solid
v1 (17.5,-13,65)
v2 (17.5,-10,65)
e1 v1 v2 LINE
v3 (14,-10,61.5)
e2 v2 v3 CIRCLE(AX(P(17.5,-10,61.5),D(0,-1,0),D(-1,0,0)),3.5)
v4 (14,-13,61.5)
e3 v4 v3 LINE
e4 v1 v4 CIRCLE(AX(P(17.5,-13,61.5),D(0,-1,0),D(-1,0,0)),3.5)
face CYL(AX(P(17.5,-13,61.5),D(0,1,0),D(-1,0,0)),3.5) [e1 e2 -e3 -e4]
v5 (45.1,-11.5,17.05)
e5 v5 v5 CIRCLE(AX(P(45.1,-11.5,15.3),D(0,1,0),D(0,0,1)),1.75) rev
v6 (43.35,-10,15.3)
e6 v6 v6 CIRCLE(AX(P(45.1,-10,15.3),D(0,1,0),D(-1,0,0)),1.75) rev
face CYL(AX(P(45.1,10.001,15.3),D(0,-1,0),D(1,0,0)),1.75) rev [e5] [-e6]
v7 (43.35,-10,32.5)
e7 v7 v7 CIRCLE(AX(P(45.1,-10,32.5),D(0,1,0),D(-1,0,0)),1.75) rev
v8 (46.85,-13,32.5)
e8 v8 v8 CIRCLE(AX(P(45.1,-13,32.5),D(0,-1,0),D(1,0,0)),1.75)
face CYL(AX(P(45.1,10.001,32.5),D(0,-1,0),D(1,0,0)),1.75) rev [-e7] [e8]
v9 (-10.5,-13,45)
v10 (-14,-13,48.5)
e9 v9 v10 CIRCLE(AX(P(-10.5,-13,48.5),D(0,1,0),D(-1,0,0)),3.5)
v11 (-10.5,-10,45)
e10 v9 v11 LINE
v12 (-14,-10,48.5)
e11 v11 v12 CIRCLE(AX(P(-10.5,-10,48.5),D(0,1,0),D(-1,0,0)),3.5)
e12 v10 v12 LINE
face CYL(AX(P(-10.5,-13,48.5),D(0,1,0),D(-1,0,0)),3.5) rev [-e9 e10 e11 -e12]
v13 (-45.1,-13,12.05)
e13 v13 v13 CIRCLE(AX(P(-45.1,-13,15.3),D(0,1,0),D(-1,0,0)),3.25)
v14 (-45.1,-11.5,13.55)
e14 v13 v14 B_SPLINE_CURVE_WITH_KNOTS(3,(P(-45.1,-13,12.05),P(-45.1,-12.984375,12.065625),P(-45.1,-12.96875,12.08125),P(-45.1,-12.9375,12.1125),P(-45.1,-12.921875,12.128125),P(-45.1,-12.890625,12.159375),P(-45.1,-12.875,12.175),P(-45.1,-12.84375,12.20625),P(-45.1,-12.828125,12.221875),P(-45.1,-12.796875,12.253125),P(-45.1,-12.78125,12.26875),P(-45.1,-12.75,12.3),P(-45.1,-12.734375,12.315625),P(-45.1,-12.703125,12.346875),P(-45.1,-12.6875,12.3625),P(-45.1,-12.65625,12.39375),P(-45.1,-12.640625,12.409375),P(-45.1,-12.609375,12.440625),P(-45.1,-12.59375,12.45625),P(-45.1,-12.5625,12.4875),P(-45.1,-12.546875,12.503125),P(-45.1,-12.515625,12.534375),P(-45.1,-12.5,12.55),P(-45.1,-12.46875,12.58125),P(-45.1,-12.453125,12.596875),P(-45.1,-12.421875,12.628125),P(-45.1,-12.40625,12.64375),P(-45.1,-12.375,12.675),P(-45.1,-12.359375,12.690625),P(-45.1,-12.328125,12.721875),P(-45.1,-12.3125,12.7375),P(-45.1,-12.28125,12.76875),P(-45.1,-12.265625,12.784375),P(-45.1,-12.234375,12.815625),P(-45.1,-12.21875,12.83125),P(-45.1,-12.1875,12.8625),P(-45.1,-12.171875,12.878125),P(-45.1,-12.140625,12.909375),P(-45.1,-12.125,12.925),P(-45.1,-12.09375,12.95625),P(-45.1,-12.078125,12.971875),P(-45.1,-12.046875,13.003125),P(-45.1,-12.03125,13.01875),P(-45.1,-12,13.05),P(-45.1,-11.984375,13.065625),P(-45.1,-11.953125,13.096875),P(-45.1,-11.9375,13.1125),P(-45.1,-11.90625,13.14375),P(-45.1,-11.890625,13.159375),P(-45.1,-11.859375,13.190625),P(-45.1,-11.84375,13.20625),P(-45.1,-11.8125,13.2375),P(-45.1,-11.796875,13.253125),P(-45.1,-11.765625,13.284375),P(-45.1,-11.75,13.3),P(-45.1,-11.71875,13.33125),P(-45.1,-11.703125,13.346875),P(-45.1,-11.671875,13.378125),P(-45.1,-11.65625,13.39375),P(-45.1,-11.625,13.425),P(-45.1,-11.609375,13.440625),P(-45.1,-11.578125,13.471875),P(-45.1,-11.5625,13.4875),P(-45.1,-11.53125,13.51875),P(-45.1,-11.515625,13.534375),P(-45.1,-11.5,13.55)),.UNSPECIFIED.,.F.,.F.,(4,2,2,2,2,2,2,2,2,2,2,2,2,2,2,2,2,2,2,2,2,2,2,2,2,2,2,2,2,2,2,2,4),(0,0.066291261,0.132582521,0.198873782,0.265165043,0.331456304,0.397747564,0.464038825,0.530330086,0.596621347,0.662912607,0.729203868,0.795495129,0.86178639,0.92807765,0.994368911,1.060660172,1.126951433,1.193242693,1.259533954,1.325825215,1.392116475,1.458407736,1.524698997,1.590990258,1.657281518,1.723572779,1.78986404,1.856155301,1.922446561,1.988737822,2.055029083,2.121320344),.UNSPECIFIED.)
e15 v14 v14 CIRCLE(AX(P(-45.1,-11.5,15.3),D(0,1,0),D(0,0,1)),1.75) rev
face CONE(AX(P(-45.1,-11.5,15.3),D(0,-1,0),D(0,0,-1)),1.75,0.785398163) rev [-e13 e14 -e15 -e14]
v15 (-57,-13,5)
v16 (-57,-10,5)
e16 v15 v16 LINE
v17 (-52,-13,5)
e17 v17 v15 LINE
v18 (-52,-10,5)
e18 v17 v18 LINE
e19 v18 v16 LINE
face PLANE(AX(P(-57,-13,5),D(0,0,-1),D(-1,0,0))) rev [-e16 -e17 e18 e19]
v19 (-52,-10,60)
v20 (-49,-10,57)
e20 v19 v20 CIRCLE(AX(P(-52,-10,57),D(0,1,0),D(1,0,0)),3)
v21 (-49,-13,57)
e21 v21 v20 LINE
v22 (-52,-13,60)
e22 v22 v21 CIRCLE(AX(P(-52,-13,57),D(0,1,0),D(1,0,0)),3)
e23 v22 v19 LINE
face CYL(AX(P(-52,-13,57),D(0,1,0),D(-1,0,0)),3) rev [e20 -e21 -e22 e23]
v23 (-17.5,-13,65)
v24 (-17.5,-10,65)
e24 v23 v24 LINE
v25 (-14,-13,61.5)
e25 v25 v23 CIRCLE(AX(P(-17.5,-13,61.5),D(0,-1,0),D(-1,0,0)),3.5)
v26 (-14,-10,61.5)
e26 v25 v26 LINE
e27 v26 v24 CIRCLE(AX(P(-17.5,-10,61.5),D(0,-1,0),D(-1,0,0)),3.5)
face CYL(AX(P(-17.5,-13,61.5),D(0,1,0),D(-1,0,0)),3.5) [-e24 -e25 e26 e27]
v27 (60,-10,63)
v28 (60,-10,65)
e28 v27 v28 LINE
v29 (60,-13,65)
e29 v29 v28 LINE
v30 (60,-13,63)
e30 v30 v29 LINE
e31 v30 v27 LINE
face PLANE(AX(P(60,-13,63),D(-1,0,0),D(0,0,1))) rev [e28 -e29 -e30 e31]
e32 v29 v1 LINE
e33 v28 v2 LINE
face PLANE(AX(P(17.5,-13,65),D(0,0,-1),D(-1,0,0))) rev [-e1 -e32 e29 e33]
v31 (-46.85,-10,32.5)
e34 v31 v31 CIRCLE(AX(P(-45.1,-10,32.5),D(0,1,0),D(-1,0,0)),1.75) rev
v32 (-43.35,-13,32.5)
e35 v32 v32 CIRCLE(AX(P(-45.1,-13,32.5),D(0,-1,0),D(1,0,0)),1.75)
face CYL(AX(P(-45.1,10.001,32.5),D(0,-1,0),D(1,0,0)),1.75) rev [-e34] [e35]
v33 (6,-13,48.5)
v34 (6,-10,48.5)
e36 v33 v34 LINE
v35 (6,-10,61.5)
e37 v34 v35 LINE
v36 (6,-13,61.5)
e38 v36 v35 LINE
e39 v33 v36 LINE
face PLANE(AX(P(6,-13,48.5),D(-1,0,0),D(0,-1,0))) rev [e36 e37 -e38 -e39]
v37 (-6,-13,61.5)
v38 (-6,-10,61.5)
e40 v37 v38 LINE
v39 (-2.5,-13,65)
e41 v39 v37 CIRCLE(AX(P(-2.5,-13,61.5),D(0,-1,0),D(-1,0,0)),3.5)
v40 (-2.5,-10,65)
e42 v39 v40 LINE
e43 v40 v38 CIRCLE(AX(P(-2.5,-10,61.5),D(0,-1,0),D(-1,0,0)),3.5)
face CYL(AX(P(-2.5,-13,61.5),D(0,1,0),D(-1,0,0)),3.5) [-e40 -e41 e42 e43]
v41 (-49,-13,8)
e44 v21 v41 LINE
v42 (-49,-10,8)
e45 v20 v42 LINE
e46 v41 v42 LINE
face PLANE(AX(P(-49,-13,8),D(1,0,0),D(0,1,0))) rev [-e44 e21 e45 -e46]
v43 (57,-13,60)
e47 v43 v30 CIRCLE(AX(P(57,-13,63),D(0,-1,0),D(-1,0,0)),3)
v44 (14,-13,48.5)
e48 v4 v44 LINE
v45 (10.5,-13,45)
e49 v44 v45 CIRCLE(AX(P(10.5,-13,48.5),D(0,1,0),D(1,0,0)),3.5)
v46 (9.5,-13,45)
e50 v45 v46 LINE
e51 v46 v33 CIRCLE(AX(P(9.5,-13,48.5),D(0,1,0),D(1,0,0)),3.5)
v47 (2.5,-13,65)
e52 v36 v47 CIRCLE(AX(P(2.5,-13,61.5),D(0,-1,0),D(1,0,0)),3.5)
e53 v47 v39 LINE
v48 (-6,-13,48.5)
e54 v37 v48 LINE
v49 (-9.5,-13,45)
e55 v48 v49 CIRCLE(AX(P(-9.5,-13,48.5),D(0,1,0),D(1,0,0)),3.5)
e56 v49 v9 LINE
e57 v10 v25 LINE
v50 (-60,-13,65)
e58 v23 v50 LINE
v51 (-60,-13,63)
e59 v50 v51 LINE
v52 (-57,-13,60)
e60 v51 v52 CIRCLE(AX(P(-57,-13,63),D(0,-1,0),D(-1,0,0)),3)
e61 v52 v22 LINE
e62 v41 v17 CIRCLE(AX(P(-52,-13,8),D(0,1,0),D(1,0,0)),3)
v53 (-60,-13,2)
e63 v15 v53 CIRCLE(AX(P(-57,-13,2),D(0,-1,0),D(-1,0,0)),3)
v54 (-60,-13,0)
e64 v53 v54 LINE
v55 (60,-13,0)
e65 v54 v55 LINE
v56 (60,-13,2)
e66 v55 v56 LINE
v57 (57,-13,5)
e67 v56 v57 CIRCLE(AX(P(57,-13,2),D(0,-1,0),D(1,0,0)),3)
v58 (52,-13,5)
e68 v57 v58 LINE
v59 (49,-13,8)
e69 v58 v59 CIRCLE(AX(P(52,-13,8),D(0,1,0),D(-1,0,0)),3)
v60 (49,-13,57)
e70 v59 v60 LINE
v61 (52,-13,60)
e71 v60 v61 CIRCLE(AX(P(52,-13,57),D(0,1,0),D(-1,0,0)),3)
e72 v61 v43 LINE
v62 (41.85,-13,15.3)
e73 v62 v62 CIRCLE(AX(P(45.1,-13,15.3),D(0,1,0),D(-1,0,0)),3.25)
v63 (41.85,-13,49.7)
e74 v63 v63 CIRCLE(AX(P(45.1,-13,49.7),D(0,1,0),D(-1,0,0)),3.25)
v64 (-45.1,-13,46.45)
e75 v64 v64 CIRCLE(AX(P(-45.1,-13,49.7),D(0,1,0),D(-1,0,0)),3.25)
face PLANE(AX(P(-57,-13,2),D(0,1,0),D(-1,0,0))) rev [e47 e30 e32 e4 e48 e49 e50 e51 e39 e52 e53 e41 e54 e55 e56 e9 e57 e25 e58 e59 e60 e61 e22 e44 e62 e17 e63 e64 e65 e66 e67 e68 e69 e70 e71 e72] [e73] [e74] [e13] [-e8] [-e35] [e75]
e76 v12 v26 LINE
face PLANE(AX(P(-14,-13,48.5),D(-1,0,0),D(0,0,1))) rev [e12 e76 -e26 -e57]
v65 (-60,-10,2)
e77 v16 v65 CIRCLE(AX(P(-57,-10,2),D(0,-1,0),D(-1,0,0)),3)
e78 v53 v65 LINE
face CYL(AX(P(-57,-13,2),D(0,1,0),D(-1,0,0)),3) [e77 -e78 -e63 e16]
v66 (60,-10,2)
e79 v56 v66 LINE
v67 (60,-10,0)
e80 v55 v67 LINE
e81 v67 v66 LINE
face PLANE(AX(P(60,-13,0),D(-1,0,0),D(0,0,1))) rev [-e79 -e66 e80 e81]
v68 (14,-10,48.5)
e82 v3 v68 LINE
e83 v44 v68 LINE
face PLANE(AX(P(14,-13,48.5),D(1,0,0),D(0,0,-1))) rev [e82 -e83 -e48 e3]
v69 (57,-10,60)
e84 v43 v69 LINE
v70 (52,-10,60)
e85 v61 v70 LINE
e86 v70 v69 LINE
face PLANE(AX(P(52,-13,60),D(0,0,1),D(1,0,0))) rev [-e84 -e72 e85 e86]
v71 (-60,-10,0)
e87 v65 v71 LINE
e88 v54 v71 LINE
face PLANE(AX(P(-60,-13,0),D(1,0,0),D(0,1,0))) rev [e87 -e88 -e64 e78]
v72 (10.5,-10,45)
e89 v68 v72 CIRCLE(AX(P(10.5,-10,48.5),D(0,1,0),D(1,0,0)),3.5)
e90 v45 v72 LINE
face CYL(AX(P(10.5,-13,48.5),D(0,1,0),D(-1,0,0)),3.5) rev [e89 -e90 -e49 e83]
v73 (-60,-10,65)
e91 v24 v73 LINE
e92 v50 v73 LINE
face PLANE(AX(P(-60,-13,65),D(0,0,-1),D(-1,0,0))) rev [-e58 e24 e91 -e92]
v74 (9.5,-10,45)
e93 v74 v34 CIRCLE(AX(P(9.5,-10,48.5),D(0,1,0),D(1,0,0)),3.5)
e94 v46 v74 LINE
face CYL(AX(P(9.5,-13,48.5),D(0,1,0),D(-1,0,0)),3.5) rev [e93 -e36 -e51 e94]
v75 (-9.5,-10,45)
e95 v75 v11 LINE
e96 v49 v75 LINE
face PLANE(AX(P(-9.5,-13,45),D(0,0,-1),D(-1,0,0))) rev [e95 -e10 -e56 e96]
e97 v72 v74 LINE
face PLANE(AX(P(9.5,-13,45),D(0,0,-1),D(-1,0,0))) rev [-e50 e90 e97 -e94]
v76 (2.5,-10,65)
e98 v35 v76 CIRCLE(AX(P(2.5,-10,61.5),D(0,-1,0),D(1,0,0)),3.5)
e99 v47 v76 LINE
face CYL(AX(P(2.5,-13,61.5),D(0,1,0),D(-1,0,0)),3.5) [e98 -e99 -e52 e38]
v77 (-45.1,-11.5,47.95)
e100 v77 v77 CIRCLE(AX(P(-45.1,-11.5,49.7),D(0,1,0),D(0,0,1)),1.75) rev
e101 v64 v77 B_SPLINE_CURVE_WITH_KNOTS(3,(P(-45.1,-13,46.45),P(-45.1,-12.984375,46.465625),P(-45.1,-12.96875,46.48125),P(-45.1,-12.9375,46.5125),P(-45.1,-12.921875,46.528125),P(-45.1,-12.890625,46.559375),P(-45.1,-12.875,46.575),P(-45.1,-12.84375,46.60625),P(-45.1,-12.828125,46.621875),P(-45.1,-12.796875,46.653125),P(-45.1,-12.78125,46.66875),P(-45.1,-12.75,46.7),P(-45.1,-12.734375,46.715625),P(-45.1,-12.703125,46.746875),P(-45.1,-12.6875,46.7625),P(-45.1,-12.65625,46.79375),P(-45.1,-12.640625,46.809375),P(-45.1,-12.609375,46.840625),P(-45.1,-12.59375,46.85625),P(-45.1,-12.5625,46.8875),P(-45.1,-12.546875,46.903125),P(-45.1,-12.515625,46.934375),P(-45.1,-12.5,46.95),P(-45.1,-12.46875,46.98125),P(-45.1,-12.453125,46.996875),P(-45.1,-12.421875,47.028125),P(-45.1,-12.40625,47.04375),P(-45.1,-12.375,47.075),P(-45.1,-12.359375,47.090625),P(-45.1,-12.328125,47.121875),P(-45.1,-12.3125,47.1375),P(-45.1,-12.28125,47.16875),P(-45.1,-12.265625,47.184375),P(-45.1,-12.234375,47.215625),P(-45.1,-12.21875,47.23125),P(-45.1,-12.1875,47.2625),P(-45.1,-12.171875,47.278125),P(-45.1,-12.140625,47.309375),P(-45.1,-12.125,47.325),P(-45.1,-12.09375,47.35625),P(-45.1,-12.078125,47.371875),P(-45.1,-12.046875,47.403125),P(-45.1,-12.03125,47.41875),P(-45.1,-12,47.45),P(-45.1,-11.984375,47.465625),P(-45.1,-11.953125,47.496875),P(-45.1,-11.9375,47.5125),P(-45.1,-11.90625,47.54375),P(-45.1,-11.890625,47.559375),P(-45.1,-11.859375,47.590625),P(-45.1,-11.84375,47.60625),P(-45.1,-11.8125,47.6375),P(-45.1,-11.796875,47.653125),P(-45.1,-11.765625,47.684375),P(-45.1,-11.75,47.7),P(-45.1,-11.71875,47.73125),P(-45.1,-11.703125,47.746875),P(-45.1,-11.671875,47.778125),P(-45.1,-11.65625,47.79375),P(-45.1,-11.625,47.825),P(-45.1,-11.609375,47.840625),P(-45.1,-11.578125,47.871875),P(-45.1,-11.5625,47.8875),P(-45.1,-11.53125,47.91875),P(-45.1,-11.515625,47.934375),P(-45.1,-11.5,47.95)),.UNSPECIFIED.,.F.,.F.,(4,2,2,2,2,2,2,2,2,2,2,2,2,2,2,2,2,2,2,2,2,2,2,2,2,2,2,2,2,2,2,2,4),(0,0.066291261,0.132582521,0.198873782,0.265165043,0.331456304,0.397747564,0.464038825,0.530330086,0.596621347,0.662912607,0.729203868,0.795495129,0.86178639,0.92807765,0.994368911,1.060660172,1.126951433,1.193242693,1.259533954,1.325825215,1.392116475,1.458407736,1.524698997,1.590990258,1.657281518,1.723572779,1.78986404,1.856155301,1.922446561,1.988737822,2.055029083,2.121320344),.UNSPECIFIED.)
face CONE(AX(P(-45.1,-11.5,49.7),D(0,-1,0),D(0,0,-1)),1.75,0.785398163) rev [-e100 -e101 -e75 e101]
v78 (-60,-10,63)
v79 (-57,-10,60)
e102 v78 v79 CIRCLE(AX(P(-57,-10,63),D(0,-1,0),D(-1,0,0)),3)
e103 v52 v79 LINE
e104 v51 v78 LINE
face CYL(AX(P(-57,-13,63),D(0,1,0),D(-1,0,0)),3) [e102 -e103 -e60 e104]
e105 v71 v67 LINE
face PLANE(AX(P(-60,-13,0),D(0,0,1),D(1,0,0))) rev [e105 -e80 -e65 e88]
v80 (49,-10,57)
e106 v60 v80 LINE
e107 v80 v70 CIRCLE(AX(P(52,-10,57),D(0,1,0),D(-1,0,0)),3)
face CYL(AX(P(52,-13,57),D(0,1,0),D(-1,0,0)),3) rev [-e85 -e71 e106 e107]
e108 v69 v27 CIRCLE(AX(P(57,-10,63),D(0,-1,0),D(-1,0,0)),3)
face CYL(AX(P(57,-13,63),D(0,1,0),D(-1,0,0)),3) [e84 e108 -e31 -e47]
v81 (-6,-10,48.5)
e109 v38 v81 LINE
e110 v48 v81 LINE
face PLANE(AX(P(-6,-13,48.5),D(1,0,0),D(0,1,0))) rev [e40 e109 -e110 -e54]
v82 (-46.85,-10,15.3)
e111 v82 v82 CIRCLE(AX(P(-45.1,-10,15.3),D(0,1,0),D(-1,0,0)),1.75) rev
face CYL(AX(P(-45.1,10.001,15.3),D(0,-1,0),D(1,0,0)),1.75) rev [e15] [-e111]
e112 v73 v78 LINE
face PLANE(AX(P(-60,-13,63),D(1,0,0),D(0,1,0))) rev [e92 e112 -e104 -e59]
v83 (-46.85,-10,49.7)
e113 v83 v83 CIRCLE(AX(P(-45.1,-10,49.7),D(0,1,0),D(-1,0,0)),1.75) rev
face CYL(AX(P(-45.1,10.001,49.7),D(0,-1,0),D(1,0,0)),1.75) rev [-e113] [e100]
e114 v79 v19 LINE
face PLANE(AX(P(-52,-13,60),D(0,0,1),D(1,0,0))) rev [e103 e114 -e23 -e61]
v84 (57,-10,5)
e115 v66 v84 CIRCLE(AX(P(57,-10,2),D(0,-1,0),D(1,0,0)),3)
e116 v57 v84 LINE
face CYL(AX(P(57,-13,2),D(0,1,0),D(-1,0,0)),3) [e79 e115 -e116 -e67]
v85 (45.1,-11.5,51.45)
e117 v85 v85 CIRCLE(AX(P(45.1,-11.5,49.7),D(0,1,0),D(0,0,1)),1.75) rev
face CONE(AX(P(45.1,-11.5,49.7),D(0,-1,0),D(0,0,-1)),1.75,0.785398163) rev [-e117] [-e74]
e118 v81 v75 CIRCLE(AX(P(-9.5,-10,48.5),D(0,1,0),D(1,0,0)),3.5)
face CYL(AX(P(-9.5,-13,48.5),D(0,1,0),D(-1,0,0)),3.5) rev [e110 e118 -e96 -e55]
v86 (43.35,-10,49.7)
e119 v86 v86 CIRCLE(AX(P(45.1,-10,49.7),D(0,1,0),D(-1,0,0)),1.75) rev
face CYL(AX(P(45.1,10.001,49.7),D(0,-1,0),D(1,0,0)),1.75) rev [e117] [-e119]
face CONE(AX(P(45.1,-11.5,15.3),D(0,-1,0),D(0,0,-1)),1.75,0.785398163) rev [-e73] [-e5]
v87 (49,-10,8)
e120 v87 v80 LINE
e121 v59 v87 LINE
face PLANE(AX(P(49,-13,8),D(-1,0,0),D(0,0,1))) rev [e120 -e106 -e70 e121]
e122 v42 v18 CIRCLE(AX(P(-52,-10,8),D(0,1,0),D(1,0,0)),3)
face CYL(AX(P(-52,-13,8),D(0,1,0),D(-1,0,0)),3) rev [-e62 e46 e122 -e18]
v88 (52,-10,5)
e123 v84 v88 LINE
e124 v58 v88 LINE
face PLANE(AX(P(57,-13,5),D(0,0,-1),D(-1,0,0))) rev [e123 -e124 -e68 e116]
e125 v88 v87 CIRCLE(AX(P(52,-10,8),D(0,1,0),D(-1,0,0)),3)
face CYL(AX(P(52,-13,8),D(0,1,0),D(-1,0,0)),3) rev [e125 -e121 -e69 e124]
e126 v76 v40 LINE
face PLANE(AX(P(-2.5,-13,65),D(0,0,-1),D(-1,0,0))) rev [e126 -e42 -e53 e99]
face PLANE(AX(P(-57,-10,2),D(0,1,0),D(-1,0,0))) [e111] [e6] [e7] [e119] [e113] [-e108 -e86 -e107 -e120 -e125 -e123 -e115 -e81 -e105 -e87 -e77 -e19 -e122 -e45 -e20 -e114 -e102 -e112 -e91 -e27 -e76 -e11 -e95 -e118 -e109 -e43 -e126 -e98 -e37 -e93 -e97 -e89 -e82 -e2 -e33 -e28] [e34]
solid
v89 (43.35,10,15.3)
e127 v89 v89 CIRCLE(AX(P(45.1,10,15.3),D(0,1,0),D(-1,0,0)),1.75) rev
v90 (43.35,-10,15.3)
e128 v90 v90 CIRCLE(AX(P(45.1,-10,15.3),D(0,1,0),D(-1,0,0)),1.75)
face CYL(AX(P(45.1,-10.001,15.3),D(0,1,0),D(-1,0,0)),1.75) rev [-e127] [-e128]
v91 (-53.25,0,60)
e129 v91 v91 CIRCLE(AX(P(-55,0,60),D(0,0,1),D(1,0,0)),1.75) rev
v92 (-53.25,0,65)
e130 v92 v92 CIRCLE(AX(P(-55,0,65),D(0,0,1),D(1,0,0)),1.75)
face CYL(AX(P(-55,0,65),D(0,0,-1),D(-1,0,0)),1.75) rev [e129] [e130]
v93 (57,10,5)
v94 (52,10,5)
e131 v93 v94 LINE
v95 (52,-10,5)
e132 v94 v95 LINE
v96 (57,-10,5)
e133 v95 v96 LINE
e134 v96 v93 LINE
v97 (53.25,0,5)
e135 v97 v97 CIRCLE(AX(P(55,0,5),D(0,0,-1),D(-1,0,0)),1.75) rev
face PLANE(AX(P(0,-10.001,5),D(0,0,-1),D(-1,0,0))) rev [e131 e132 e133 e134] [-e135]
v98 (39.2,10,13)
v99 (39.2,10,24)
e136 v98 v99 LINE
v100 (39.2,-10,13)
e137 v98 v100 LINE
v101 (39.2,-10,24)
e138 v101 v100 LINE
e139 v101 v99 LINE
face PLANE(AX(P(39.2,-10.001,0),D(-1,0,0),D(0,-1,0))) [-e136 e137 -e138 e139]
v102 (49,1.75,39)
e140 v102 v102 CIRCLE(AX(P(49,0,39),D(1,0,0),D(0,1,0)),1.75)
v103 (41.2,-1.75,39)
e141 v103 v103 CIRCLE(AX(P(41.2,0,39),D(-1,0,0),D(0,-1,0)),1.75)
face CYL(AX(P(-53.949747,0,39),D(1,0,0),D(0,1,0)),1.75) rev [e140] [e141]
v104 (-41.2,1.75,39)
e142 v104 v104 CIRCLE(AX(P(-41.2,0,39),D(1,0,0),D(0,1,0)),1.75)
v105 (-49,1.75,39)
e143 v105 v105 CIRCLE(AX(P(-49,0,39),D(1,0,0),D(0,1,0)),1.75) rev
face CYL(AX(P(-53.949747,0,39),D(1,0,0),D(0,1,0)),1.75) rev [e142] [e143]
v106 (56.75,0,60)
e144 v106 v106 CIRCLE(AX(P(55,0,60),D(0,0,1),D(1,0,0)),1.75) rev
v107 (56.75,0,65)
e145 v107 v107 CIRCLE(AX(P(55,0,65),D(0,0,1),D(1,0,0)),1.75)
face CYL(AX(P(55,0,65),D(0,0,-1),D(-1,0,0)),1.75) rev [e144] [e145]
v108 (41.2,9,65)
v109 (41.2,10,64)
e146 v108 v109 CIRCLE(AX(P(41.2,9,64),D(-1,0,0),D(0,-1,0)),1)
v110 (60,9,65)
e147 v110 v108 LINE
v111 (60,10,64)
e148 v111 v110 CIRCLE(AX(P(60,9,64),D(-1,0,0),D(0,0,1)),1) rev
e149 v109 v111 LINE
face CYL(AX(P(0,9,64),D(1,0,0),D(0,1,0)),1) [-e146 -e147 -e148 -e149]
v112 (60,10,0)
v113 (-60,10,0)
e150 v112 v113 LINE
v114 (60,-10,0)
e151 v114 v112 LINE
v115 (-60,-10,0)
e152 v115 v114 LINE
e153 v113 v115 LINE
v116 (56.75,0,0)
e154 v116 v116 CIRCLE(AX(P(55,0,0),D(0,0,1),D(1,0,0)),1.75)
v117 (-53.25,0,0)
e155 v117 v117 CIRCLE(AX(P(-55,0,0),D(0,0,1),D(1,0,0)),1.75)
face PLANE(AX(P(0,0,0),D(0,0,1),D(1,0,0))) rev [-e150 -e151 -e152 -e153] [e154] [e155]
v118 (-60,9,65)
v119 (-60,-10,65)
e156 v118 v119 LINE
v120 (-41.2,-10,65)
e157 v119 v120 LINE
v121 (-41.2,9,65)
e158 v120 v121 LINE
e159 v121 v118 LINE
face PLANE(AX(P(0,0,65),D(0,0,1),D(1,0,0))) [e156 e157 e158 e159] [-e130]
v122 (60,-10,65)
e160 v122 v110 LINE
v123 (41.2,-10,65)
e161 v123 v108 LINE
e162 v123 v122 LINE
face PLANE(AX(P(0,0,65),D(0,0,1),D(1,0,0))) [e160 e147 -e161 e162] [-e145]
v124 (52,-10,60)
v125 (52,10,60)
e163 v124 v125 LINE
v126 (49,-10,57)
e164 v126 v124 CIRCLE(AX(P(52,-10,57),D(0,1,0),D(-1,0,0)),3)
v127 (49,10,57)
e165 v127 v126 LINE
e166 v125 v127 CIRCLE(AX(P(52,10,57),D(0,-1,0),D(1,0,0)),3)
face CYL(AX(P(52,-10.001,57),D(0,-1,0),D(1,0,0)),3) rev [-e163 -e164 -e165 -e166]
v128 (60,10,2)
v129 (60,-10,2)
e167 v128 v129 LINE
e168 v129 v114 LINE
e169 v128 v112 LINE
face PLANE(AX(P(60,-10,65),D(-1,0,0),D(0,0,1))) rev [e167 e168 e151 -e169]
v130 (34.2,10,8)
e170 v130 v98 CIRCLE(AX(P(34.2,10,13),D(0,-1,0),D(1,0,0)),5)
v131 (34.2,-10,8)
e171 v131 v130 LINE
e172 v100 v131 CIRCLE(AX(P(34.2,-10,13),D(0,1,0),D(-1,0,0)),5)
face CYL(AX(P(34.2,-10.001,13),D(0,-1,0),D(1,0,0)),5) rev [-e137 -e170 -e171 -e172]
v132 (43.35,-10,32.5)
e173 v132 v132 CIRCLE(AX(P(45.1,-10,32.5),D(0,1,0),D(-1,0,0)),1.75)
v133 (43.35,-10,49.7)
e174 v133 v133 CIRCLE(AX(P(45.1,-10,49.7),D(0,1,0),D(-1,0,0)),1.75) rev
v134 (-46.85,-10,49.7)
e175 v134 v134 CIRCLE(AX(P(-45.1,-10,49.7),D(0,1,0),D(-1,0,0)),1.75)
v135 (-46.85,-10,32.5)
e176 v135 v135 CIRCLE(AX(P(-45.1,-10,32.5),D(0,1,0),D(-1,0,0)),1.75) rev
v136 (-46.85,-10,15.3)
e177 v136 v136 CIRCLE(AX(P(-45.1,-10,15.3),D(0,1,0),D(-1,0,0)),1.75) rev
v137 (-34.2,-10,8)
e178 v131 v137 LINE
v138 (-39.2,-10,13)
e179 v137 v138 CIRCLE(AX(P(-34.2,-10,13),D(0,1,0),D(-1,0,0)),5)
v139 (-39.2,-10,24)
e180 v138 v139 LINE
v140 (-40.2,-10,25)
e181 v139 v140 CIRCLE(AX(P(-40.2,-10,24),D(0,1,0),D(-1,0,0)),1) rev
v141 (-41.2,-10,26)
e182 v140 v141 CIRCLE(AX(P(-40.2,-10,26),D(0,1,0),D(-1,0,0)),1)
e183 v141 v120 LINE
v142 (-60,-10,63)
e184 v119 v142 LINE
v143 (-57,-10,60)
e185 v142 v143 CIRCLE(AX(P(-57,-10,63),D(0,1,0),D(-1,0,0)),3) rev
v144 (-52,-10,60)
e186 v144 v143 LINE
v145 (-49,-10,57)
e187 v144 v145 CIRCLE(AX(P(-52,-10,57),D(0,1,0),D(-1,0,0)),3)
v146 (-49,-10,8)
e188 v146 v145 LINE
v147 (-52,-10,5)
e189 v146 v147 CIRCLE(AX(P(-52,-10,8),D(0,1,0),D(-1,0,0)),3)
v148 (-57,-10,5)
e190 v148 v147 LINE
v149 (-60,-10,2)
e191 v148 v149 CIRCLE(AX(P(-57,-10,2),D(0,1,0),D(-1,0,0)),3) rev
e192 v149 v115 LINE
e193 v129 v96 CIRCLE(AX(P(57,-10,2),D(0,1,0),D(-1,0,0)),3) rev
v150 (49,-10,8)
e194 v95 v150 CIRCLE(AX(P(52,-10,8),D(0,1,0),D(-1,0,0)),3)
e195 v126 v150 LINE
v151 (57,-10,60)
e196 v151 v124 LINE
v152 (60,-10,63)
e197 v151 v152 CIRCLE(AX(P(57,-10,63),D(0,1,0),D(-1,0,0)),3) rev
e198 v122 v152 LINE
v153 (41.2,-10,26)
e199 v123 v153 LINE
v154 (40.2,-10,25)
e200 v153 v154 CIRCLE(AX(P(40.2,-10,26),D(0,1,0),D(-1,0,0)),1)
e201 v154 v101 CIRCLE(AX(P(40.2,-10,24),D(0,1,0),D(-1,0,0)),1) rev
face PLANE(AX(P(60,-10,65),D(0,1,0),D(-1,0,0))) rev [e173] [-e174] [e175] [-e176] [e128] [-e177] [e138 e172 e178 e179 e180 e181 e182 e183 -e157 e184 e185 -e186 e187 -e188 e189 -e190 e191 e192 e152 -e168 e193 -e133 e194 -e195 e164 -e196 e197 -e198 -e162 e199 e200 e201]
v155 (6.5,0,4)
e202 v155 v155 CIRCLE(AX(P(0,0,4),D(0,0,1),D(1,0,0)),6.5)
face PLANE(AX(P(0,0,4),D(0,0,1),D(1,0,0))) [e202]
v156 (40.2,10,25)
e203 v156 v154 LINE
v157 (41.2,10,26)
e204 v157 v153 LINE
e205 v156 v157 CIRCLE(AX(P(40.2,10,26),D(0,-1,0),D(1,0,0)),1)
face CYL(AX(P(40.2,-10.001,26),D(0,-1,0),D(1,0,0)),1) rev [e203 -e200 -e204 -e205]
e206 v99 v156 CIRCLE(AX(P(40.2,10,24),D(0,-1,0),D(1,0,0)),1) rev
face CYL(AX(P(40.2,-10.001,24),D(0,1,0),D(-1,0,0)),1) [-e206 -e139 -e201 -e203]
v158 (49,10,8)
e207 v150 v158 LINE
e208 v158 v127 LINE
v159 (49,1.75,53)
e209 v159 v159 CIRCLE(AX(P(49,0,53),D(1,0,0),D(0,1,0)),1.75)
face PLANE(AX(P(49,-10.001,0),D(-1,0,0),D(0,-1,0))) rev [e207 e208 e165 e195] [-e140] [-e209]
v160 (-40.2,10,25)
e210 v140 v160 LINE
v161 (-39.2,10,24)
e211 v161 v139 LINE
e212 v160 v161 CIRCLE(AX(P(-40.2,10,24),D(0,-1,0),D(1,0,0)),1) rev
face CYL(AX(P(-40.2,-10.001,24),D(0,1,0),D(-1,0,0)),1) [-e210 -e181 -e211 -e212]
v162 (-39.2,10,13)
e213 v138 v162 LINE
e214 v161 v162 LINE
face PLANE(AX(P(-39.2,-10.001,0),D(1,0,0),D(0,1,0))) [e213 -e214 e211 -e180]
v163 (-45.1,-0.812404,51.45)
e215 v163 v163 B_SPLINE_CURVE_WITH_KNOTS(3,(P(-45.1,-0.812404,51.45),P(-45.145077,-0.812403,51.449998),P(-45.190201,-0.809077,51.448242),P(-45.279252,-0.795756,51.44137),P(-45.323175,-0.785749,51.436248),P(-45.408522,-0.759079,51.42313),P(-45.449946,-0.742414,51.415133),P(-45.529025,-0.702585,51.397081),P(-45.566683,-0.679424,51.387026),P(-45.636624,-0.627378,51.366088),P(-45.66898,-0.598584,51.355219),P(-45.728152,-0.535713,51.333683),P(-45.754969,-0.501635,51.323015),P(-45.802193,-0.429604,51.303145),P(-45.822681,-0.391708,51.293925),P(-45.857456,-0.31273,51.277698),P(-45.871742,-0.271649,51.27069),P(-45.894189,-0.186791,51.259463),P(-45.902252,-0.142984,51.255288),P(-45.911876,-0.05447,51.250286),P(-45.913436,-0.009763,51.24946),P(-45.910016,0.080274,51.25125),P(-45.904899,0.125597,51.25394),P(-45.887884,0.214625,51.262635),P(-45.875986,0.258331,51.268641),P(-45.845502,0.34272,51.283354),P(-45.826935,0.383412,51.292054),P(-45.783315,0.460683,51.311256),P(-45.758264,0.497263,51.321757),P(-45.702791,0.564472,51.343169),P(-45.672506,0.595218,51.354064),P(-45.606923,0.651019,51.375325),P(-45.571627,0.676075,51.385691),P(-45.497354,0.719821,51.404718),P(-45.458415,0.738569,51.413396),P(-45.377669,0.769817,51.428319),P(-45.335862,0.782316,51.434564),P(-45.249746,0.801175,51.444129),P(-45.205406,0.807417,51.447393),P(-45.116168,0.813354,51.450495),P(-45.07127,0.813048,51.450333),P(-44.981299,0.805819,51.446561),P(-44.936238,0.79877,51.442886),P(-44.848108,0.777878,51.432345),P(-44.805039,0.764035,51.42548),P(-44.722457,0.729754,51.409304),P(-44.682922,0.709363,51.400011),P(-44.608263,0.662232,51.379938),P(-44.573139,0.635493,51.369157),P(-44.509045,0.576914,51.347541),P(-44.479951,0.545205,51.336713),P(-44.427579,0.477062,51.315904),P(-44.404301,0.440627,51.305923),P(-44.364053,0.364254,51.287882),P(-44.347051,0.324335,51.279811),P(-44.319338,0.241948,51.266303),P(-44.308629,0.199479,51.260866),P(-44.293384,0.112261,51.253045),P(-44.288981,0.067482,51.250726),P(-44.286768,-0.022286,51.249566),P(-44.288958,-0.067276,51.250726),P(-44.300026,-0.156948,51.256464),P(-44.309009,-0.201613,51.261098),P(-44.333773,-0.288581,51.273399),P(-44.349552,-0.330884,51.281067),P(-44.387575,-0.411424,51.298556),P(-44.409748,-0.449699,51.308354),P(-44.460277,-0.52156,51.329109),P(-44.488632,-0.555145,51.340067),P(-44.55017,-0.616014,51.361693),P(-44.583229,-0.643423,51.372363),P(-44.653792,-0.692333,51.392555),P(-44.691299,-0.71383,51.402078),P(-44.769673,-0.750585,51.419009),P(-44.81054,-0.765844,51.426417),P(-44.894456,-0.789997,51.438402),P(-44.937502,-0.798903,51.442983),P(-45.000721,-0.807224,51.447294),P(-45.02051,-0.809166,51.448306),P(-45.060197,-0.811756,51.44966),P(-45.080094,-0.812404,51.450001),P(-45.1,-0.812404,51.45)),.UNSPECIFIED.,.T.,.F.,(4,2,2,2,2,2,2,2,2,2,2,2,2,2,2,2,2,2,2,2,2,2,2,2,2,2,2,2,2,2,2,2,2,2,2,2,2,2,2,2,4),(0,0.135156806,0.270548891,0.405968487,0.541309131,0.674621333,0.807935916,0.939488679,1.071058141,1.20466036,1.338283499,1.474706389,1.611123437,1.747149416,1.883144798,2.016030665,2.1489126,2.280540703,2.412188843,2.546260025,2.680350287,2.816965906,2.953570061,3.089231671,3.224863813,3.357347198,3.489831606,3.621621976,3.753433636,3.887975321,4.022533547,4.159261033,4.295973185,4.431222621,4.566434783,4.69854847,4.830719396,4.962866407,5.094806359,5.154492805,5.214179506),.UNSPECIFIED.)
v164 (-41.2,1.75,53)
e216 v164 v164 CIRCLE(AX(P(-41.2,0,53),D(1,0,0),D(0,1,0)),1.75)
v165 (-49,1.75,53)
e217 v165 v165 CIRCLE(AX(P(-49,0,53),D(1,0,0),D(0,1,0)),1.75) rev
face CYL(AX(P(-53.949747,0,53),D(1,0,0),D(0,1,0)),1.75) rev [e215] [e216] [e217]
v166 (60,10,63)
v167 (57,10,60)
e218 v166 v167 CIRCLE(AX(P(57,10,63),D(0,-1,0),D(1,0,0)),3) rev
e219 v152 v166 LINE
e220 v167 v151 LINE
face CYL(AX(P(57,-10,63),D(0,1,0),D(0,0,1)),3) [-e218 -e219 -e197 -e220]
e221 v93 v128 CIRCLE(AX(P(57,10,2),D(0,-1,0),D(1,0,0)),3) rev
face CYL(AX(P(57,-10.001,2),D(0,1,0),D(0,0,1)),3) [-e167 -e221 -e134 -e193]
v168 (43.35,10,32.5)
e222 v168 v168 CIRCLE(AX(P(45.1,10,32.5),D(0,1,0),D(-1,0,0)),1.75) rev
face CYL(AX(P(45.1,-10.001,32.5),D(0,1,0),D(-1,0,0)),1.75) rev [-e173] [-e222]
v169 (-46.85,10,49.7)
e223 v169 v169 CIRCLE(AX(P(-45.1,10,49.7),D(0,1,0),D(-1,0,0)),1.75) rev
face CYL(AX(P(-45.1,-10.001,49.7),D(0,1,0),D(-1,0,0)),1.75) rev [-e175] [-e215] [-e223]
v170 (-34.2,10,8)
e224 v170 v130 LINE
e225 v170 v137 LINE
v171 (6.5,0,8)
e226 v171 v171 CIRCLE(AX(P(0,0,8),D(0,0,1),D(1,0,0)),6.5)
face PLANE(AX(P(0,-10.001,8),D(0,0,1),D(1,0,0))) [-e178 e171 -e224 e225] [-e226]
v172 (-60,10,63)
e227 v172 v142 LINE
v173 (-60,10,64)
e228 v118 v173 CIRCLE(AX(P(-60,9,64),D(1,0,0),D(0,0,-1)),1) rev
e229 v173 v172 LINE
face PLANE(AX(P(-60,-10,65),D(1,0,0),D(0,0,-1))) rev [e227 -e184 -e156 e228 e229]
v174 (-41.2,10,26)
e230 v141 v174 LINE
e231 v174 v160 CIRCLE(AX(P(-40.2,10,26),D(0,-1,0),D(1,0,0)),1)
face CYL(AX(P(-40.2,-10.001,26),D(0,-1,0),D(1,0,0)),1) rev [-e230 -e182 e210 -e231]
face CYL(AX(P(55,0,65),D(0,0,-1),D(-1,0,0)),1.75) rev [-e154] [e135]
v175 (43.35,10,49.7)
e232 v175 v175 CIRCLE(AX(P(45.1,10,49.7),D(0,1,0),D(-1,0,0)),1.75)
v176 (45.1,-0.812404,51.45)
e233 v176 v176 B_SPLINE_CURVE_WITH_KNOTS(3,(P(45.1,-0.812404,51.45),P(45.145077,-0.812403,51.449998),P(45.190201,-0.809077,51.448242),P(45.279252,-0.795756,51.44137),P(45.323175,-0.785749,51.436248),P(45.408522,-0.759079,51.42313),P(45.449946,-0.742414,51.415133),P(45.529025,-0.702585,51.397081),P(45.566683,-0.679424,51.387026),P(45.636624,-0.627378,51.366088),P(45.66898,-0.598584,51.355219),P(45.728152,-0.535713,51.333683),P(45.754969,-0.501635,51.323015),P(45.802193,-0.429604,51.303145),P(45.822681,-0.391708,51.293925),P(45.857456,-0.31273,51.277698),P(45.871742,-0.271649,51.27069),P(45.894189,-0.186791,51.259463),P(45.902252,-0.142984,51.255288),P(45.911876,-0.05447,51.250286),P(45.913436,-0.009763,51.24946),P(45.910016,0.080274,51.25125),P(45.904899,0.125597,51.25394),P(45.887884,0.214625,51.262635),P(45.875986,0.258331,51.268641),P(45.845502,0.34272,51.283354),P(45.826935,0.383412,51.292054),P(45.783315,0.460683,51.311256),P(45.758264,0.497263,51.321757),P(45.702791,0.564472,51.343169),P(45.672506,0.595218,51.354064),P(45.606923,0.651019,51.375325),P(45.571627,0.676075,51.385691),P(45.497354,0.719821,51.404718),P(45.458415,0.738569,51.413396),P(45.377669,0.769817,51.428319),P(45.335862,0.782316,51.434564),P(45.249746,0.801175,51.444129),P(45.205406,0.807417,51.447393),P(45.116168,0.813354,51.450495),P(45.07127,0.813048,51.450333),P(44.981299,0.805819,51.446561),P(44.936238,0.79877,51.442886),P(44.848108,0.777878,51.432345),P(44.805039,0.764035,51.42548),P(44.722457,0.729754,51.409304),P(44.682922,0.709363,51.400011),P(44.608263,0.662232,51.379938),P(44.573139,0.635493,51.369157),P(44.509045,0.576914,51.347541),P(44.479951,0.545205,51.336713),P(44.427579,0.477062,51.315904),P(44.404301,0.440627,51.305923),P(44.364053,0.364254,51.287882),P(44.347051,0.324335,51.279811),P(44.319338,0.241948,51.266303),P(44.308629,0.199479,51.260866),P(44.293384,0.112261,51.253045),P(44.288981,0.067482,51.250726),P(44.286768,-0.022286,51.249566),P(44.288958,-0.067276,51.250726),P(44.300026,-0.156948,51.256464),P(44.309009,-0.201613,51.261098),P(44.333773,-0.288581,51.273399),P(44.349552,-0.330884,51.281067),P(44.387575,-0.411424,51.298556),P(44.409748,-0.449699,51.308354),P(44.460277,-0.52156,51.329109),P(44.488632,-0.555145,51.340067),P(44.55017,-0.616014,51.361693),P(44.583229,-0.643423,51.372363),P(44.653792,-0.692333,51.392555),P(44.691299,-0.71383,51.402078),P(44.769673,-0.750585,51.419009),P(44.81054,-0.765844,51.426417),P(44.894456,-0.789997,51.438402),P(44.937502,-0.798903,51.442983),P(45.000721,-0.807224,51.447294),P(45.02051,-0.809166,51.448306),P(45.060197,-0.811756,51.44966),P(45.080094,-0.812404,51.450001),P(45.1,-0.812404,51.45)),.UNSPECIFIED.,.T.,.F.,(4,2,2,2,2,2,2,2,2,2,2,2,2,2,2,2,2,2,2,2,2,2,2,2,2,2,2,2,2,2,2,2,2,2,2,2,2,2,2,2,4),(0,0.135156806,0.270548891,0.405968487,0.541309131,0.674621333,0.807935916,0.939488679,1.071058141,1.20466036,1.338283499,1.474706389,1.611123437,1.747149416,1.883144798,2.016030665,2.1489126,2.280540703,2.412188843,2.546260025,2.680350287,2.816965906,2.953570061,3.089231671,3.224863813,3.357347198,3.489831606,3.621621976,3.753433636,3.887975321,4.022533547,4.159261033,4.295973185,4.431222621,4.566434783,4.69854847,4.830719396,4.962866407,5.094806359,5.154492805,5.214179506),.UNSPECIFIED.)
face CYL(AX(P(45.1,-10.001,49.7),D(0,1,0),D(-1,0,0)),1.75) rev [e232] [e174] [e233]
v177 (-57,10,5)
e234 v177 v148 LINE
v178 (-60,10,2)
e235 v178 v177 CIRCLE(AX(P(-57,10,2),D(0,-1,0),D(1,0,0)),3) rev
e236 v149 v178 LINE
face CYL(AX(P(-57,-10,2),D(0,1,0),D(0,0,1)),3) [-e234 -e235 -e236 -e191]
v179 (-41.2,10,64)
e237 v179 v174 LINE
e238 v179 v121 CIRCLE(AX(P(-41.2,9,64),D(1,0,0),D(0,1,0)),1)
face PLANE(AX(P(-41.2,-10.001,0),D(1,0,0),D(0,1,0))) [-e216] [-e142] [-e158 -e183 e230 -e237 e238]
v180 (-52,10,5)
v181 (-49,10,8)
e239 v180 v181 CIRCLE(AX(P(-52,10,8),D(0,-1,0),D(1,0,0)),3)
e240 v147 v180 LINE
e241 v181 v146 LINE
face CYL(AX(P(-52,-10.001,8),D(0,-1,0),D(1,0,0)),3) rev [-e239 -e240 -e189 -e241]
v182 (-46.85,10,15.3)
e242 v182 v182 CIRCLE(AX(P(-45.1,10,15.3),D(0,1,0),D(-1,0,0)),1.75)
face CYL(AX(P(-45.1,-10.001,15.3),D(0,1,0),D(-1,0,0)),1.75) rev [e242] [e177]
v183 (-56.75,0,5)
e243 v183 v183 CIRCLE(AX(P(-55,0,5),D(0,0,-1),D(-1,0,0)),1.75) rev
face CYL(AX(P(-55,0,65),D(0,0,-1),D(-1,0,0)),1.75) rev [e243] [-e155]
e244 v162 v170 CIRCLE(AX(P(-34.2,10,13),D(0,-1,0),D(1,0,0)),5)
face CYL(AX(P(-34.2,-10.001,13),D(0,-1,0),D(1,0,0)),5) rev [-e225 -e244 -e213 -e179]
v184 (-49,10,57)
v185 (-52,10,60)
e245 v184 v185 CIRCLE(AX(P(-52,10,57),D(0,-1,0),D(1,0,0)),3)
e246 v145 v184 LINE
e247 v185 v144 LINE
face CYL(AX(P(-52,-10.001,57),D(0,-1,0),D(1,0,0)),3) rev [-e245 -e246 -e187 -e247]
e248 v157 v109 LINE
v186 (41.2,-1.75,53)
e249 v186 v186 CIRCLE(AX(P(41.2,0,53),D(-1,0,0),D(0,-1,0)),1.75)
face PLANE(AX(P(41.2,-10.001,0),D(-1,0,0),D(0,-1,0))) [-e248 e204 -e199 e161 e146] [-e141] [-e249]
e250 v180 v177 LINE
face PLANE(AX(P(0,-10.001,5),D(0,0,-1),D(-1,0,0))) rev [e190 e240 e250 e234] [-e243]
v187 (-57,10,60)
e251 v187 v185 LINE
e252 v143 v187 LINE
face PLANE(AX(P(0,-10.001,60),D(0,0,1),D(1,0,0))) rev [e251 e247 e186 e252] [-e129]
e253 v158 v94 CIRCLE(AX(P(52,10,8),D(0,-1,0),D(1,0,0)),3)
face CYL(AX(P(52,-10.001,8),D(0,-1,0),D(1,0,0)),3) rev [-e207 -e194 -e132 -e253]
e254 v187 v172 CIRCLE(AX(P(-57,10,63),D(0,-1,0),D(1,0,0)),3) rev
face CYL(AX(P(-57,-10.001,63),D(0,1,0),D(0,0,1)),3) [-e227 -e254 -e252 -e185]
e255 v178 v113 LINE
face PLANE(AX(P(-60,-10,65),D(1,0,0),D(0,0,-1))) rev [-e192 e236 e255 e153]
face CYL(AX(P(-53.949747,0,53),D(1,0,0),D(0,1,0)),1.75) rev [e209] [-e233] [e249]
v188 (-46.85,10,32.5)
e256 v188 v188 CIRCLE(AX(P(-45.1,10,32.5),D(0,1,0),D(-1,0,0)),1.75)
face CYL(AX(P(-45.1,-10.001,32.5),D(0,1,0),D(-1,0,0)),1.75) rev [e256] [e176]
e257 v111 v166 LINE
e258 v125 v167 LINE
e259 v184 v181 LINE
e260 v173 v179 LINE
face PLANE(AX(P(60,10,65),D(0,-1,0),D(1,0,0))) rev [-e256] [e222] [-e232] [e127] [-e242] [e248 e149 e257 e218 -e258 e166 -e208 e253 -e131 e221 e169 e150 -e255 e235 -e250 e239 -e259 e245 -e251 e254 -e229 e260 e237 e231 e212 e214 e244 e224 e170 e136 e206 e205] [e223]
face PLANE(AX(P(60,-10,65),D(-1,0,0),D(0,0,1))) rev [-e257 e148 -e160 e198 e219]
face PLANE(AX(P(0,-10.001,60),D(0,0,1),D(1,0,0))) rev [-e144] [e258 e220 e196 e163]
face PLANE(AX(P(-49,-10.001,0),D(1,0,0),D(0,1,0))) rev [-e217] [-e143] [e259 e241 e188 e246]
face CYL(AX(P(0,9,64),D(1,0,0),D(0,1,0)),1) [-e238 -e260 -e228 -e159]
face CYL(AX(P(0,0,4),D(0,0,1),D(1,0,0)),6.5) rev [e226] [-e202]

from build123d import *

# Parameters (mm, degrees)
ESQUISSE1_W             = 120
ESQUISSE1_H             = 20
ESQUISSE1_R             = 1.75
BOSS_EXTRU_1_DEPTH      = 65
ENL_V_MAT_EXTRU_1_REACH = 92.692
ESQUISSE2_W             = 11
ESQUISSE2_H             = 55
ESQUISSE2_R             = 1.75
CONG_1_R                = 1
CONG_2_R                = 5
CONG_3_R                = 3
ENL_V_MAT_EXTRU_2_REACH = 129.303
ESQUISSE5_R             = 1.75
ESQUISSE6_R             = 6.5
ENL_V_MAT_EXTRU_3_DEPTH = 4
BOSS_EXTRU_2_DEPTH      = 3
ENL_V_START             = -3
ESQUISSE8_R             = 1.75
ENL_V_MAT_EXTRU_4_DEPTH = 3
CHANFREIN1_SIZE         = 1.5


with BuildPart() as part:
    # Esquisse1 → Boss.-Extru.1 (new body)
    with BuildSketch(Plane.XY):
        Rectangle(ESQUISSE1_W, ESQUISSE1_H)
        with Locations((-55, 0)):
            Circle(ESQUISSE1_R, mode=Mode.SUBTRACT)
        with Locations((55, 0)):
            Circle(ESQUISSE1_R, mode=Mode.SUBTRACT)
    extrude(amount=BOSS_EXTRU_1_DEPTH)

    # Esquisse2 → Enlèv. mat.-Extru.1 (cut, up to next)
    with BuildSketch(Plane(origin=(0, 10, 0), x_dir=(1, 0, 0), z_dir=(0, 1, 0)), mode=Mode.PRIVATE) as enl_v_mat_extru_1_sk1:
        Polygon((-41.2, -25), (-41.2, -65), (41.2, -65), (41.2, -25), (39.2, -25), (39.2, -8), (-39.2, -8), (-39.2, -25), align=None)
    enl_v_mat_extru_1_tool1 = extrude(enl_v_mat_extru_1_sk1.sketch, amount=-ENL_V_MAT_EXTRU_1_REACH, mode=Mode.PRIVATE) & part.part
    # Esquisse2 → Enlèv. mat.-Extru.1 (cut, up to next)
    with BuildSketch(Plane(origin=(0, 10, 0), x_dir=(1, 0, 0), z_dir=(0, 1, 0)), mode=Mode.PRIVATE) as enl_v_mat_extru_1_sk2:
        with Locations((-54.5, -32.5)):
            Rectangle(ESQUISSE2_W, ESQUISSE2_H)
    enl_v_mat_extru_1_tool2 = extrude(enl_v_mat_extru_1_sk2.sketch, amount=-ENL_V_MAT_EXTRU_1_REACH, mode=Mode.PRIVATE) & part.part
    # Esquisse2 → Enlèv. mat.-Extru.1 (cut, up to next)
    with BuildSketch(Plane(origin=(0, 10, 0), x_dir=(1, 0, 0), z_dir=(0, 1, 0)), mode=Mode.PRIVATE) as enl_v_mat_extru_1_sk3:
        with Locations((54.5, -32.5)):
            Rectangle(ESQUISSE2_W, ESQUISSE2_H)
    enl_v_mat_extru_1_tool3 = extrude(enl_v_mat_extru_1_sk3.sketch, amount=-ENL_V_MAT_EXTRU_1_REACH, mode=Mode.PRIVATE) & part.part
    # Esquisse2 → Enlèv. mat.-Extru.1 (cut, up to next)
    with BuildSketch(Plane(origin=(0, 10, 0), x_dir=(1, 0, 0), z_dir=(0, 1, 0)), mode=Mode.PRIVATE) as enl_v_mat_extru_1_sk4:
        with Locations(Location((-45.1, -15.3, 0), (0, 0, 180))):
            Circle(ESQUISSE2_R)
    enl_v_mat_extru_1_tool4 = extrude(enl_v_mat_extru_1_sk4.sketch, amount=-ENL_V_MAT_EXTRU_1_REACH, mode=Mode.PRIVATE) & part.part
    # Esquisse2 → Enlèv. mat.-Extru.1 (cut, up to next)
    with BuildSketch(Plane(origin=(0, 10, 0), x_dir=(1, 0, 0), z_dir=(0, 1, 0)), mode=Mode.PRIVATE) as enl_v_mat_extru_1_sk5:
        with Locations(Location((-45.1, -49.7, 0), (0, 0, 180))):
            Circle(ESQUISSE2_R)
    enl_v_mat_extru_1_tool5 = extrude(enl_v_mat_extru_1_sk5.sketch, amount=-ENL_V_MAT_EXTRU_1_REACH, mode=Mode.PRIVATE) & part.part
    # Esquisse2 → Enlèv. mat.-Extru.1 (cut, up to next)
    with BuildSketch(Plane(origin=(0, 10, 0), x_dir=(1, 0, 0), z_dir=(0, 1, 0)), mode=Mode.PRIVATE) as enl_v_mat_extru_1_sk6:
        with Locations(Location((-45.1, -32.5, 0), (0, 0, 180))):
            Circle(ESQUISSE2_R)
    enl_v_mat_extru_1_tool6 = extrude(enl_v_mat_extru_1_sk6.sketch, amount=-ENL_V_MAT_EXTRU_1_REACH, mode=Mode.PRIVATE) & part.part
    # Esquisse2 → Enlèv. mat.-Extru.1 (cut, up to next)
    with BuildSketch(Plane(origin=(0, 10, 0), x_dir=(1, 0, 0), z_dir=(0, 1, 0)), mode=Mode.PRIVATE) as enl_v_mat_extru_1_sk7:
        with Locations(Location((45.1, -15.3, 0), (0, 0, 180))):
            Circle(ESQUISSE2_R)
    enl_v_mat_extru_1_tool7 = extrude(enl_v_mat_extru_1_sk7.sketch, amount=-ENL_V_MAT_EXTRU_1_REACH, mode=Mode.PRIVATE) & part.part
    # Esquisse2 → Enlèv. mat.-Extru.1 (cut, up to next)
    with BuildSketch(Plane(origin=(0, 10, 0), x_dir=(1, 0, 0), z_dir=(0, 1, 0)), mode=Mode.PRIVATE) as enl_v_mat_extru_1_sk8:
        with Locations(Location((45.1, -32.5, 0), (0, 0, 180))):
            Circle(ESQUISSE2_R)
    enl_v_mat_extru_1_tool8 = extrude(enl_v_mat_extru_1_sk8.sketch, amount=-ENL_V_MAT_EXTRU_1_REACH, mode=Mode.PRIVATE) & part.part
    # Esquisse2 → Enlèv. mat.-Extru.1 (cut, up to next)
    with BuildSketch(Plane(origin=(0, 10, 0), x_dir=(1, 0, 0), z_dir=(0, 1, 0)), mode=Mode.PRIVATE) as enl_v_mat_extru_1_sk9:
        with Locations(Location((45.1, -49.7, 0), (0, 0, 180))):
            Circle(ESQUISSE2_R)
    enl_v_mat_extru_1_tool9 = extrude(enl_v_mat_extru_1_sk9.sketch, amount=-ENL_V_MAT_EXTRU_1_REACH, mode=Mode.PRIVATE) & part.part
    add(enl_v_mat_extru_1_tool1.solids().sort_by_distance((0, 10, 36.793813))[0], mode=Mode.SUBTRACT)
    add(enl_v_mat_extru_1_tool2.solids().sort_by_distance((-54.5, 10, 32.5))[0], mode=Mode.SUBTRACT)
    add(enl_v_mat_extru_1_tool3.solids().sort_by_distance((54.5, 10, 32.5))[0], mode=Mode.SUBTRACT)
    add(enl_v_mat_extru_1_tool4.solids().sort_by_distance((-45.1, 10, 15.3))[0], mode=Mode.SUBTRACT)
    add(enl_v_mat_extru_1_tool5.solids().sort_by_distance((-45.1, 10, 49.7))[0], mode=Mode.SUBTRACT)
    add(enl_v_mat_extru_1_tool6.solids().sort_by_distance((-45.1, 10, 32.5))[0], mode=Mode.SUBTRACT)
    add(enl_v_mat_extru_1_tool7.solids().sort_by_distance((45.1, 10, 15.3))[0], mode=Mode.SUBTRACT)
    add(enl_v_mat_extru_1_tool8.solids().sort_by_distance((45.1, 10, 32.5))[0], mode=Mode.SUBTRACT)
    add(enl_v_mat_extru_1_tool9.solids().sort_by_distance((45.1, 10, 49.7))[0], mode=Mode.SUBTRACT)

    # Congé1
    cong_1_edges = [part.edges().sort_by_distance(p)[0] for p in [
        (50.6, 10, 65),
        (-50.6, 10, 65),
        (-41.2, 0, 25),
        (-39.2, 0, 25),
        (41.2, 0, 25),
        (39.2, 0, 25),
    ]]
    fillet(cong_1_edges, radius=CONG_1_R - 0.0001)  # a hair under: the kernel refuses the full size

    # Congé2
    cong_2_edges = [part.edges().sort_by_distance(p)[0] for p in [
        (-39.2, 0, 8),
        (39.2, 0, 8),
    ]]
    fillet(cong_2_edges, radius=CONG_2_R)

    # Congé3
    cong_3_edges = [part.edges().sort_by_distance(p)[0] for p in [
        (49, 0, 60),
        (49, 0, 5),
        (60, 0, 5),
        (60, 0, 60),
        (-49, 0, 5),
        (-49, 0, 60),
        (-60, 0, 60),
        (-60, 0, 5),
    ]]
    fillet(cong_3_edges, radius=CONG_3_R)

    # Enlèv. mat.-Extru.2: up to this face of the body (flat: up to its plane)
    enl_v_mat_extru_2_end = Plane(part.part.faces().sort_by_distance((-49, 0, 32.5))[0])
    # Esquisse5 → Enlèv. mat.-Extru.2 (cut, up to the picked face)
    with BuildSketch(Plane(origin=(49, 0, 0), x_dir=(0, 0, -1), z_dir=(1, 0, 0)), mode=Mode.PRIVATE) as enl_v_mat_extru_2_sk1:
        with Locations(Location((-53, 0, 0), (0, 0, 90))):
            Circle(ESQUISSE5_R)
    enl_v_mat_extru_2_tool1 = split(extrude(enl_v_mat_extru_2_sk1.sketch, amount=-ENL_V_MAT_EXTRU_2_REACH, mode=Mode.PRIVATE), bisect_by=enl_v_mat_extru_2_end, keep=Keep.BOTH, mode=Mode.PRIVATE)
    # Esquisse5 → Enlèv. mat.-Extru.2 (cut, up to the picked face)
    with BuildSketch(Plane(origin=(49, 0, 0), x_dir=(0, 0, -1), z_dir=(1, 0, 0)), mode=Mode.PRIVATE) as enl_v_mat_extru_2_sk2:
        with Locations(Location((-39, 0, 0), (0, 0, 90))):
            Circle(ESQUISSE5_R)
    enl_v_mat_extru_2_tool2 = split(extrude(enl_v_mat_extru_2_sk2.sketch, amount=-ENL_V_MAT_EXTRU_2_REACH, mode=Mode.PRIVATE), bisect_by=enl_v_mat_extru_2_end, keep=Keep.BOTH, mode=Mode.PRIVATE)
    add(enl_v_mat_extru_2_tool1.solids().sort_by(Axis((49, 0, 53), (-1, 0, 0)))[0], mode=Mode.SUBTRACT)
    add(enl_v_mat_extru_2_tool2.solids().sort_by(Axis((49, 0, 39), (-1, 0, 0)))[0], mode=Mode.SUBTRACT)

    # Esquisse6 → Enlèv. mat.-Extru.3 (cut)
    with BuildSketch(Plane.XY.offset(8)):
        Circle(ESQUISSE6_R)
    extrude(amount=-ENL_V_MAT_EXTRU_3_DEPTH, mode=Mode.SUBTRACT)


with BuildPart() as body_2:
    # Esquisse7 → Boss.-Extru.2 (new body)
    with BuildSketch(Plane.XZ.offset(10)):
        with BuildLine():
            Line((6, 48.5), (6, 61.5))
            ThreePointArc((6, 61.5), (4.974873734, 63.974873734), (2.5, 65))
            Line((2.5, 65), (-2.5, 65))
            ThreePointArc((-2.5, 65), (-4.974873734, 63.974873734), (-6, 61.5))
            Line((-6, 61.5), (-6, 48.5))
            ThreePointArc((-6, 48.5), (-7.025126266, 46.025126266), (-9.5, 45))
            Line((-9.5, 45), (-10.5, 45))
            ThreePointArc((-10.5, 45), (-12.974873734, 46.025126266), (-14, 48.5))
            Line((-14, 48.5), (-14, 61.5))
            ThreePointArc((-14, 61.5), (-15.025126266, 63.974873734), (-17.5, 65))
            Line((-17.5, 65), (-60, 65))
            Line((-60, 65), (-60, 63))
            ThreePointArc((-60, 63), (-59.121320344, 60.878679656), (-57, 60))
            Line((-57, 60), (-52, 60))
            ThreePointArc((-52, 60), (-49.878679656, 59.121320344), (-49, 57))
            Line((-49, 57), (-49, 8))
            ThreePointArc((-49, 8), (-49.878679656, 5.878679656), (-52, 5))
            Line((-52, 5), (-57, 5))
            ThreePointArc((-57, 5), (-59.121320344, 4.121320344), (-60, 2))
            Line((-60, 2), (-60, 0))
            Line((-60, 0), (60, 0))
            Line((60, 0), (60, 2))
            ThreePointArc((60, 2), (59.121320344, 4.121320344), (57, 5))
            Line((57, 5), (52, 5))
            ThreePointArc((52, 5), (49.878679656, 5.878679656), (49, 8))
            Line((49, 8), (49, 57))
            ThreePointArc((49, 57), (49.878679656, 59.121320344), (52, 60))
            Line((52, 60), (57, 60))
            ThreePointArc((57, 60), (59.121320344, 60.878679656), (60, 63))
            Line((60, 63), (60, 65))
            Line((60, 65), (17.5, 65))
            ThreePointArc((17.5, 65), (15.025126266, 63.974873734), (14, 61.5))
            Line((14, 61.5), (14, 48.5))
            ThreePointArc((14, 48.5), (12.974873734, 46.025126266), (10.5, 45))
            Line((10.5, 45), (9.5, 45))
            ThreePointArc((9.5, 45), (7.025126266, 46.025126266), (6, 48.5))
        make_face()
    extrude(amount=BOSS_EXTRU_2_DEPTH)

    # Esquisse8 → Enlèv. mat.-Extru.4 (cut)
    with BuildSketch(Plane.XZ.offset(13).offset(ENL_V_START)):
        with Locations((-45.1, 15.3)):
            Circle(ESQUISSE8_R)
        with Locations((-45.1, 32.5)):
            Circle(ESQUISSE8_R)
        with Locations((-45.1, 49.7)):
            Circle(ESQUISSE8_R)
        with Locations((45.1, 49.7)):
            Circle(ESQUISSE8_R)
        with Locations((45.1, 32.5)):
            Circle(ESQUISSE8_R)
        with Locations((45.1, 15.3)):
            Circle(ESQUISSE8_R)
    extrude(amount=ENL_V_MAT_EXTRU_4_DEPTH, mode=Mode.SUBTRACT)

    # Chanfrein1
    chanfrein1_edges = [body_2.edges().sort_by_distance(p)[0] for p in [
        (43.35, -13, 15.3),
        (43.35, -13, 49.7),
        (-46.85, -13, 49.7),
        (-46.85, -13, 15.3),
    ]]
    chamfer(chanfrein1_edges, length=CHANFREIN1_SIZE)


solid = Compound([part.part, body_2.part])
